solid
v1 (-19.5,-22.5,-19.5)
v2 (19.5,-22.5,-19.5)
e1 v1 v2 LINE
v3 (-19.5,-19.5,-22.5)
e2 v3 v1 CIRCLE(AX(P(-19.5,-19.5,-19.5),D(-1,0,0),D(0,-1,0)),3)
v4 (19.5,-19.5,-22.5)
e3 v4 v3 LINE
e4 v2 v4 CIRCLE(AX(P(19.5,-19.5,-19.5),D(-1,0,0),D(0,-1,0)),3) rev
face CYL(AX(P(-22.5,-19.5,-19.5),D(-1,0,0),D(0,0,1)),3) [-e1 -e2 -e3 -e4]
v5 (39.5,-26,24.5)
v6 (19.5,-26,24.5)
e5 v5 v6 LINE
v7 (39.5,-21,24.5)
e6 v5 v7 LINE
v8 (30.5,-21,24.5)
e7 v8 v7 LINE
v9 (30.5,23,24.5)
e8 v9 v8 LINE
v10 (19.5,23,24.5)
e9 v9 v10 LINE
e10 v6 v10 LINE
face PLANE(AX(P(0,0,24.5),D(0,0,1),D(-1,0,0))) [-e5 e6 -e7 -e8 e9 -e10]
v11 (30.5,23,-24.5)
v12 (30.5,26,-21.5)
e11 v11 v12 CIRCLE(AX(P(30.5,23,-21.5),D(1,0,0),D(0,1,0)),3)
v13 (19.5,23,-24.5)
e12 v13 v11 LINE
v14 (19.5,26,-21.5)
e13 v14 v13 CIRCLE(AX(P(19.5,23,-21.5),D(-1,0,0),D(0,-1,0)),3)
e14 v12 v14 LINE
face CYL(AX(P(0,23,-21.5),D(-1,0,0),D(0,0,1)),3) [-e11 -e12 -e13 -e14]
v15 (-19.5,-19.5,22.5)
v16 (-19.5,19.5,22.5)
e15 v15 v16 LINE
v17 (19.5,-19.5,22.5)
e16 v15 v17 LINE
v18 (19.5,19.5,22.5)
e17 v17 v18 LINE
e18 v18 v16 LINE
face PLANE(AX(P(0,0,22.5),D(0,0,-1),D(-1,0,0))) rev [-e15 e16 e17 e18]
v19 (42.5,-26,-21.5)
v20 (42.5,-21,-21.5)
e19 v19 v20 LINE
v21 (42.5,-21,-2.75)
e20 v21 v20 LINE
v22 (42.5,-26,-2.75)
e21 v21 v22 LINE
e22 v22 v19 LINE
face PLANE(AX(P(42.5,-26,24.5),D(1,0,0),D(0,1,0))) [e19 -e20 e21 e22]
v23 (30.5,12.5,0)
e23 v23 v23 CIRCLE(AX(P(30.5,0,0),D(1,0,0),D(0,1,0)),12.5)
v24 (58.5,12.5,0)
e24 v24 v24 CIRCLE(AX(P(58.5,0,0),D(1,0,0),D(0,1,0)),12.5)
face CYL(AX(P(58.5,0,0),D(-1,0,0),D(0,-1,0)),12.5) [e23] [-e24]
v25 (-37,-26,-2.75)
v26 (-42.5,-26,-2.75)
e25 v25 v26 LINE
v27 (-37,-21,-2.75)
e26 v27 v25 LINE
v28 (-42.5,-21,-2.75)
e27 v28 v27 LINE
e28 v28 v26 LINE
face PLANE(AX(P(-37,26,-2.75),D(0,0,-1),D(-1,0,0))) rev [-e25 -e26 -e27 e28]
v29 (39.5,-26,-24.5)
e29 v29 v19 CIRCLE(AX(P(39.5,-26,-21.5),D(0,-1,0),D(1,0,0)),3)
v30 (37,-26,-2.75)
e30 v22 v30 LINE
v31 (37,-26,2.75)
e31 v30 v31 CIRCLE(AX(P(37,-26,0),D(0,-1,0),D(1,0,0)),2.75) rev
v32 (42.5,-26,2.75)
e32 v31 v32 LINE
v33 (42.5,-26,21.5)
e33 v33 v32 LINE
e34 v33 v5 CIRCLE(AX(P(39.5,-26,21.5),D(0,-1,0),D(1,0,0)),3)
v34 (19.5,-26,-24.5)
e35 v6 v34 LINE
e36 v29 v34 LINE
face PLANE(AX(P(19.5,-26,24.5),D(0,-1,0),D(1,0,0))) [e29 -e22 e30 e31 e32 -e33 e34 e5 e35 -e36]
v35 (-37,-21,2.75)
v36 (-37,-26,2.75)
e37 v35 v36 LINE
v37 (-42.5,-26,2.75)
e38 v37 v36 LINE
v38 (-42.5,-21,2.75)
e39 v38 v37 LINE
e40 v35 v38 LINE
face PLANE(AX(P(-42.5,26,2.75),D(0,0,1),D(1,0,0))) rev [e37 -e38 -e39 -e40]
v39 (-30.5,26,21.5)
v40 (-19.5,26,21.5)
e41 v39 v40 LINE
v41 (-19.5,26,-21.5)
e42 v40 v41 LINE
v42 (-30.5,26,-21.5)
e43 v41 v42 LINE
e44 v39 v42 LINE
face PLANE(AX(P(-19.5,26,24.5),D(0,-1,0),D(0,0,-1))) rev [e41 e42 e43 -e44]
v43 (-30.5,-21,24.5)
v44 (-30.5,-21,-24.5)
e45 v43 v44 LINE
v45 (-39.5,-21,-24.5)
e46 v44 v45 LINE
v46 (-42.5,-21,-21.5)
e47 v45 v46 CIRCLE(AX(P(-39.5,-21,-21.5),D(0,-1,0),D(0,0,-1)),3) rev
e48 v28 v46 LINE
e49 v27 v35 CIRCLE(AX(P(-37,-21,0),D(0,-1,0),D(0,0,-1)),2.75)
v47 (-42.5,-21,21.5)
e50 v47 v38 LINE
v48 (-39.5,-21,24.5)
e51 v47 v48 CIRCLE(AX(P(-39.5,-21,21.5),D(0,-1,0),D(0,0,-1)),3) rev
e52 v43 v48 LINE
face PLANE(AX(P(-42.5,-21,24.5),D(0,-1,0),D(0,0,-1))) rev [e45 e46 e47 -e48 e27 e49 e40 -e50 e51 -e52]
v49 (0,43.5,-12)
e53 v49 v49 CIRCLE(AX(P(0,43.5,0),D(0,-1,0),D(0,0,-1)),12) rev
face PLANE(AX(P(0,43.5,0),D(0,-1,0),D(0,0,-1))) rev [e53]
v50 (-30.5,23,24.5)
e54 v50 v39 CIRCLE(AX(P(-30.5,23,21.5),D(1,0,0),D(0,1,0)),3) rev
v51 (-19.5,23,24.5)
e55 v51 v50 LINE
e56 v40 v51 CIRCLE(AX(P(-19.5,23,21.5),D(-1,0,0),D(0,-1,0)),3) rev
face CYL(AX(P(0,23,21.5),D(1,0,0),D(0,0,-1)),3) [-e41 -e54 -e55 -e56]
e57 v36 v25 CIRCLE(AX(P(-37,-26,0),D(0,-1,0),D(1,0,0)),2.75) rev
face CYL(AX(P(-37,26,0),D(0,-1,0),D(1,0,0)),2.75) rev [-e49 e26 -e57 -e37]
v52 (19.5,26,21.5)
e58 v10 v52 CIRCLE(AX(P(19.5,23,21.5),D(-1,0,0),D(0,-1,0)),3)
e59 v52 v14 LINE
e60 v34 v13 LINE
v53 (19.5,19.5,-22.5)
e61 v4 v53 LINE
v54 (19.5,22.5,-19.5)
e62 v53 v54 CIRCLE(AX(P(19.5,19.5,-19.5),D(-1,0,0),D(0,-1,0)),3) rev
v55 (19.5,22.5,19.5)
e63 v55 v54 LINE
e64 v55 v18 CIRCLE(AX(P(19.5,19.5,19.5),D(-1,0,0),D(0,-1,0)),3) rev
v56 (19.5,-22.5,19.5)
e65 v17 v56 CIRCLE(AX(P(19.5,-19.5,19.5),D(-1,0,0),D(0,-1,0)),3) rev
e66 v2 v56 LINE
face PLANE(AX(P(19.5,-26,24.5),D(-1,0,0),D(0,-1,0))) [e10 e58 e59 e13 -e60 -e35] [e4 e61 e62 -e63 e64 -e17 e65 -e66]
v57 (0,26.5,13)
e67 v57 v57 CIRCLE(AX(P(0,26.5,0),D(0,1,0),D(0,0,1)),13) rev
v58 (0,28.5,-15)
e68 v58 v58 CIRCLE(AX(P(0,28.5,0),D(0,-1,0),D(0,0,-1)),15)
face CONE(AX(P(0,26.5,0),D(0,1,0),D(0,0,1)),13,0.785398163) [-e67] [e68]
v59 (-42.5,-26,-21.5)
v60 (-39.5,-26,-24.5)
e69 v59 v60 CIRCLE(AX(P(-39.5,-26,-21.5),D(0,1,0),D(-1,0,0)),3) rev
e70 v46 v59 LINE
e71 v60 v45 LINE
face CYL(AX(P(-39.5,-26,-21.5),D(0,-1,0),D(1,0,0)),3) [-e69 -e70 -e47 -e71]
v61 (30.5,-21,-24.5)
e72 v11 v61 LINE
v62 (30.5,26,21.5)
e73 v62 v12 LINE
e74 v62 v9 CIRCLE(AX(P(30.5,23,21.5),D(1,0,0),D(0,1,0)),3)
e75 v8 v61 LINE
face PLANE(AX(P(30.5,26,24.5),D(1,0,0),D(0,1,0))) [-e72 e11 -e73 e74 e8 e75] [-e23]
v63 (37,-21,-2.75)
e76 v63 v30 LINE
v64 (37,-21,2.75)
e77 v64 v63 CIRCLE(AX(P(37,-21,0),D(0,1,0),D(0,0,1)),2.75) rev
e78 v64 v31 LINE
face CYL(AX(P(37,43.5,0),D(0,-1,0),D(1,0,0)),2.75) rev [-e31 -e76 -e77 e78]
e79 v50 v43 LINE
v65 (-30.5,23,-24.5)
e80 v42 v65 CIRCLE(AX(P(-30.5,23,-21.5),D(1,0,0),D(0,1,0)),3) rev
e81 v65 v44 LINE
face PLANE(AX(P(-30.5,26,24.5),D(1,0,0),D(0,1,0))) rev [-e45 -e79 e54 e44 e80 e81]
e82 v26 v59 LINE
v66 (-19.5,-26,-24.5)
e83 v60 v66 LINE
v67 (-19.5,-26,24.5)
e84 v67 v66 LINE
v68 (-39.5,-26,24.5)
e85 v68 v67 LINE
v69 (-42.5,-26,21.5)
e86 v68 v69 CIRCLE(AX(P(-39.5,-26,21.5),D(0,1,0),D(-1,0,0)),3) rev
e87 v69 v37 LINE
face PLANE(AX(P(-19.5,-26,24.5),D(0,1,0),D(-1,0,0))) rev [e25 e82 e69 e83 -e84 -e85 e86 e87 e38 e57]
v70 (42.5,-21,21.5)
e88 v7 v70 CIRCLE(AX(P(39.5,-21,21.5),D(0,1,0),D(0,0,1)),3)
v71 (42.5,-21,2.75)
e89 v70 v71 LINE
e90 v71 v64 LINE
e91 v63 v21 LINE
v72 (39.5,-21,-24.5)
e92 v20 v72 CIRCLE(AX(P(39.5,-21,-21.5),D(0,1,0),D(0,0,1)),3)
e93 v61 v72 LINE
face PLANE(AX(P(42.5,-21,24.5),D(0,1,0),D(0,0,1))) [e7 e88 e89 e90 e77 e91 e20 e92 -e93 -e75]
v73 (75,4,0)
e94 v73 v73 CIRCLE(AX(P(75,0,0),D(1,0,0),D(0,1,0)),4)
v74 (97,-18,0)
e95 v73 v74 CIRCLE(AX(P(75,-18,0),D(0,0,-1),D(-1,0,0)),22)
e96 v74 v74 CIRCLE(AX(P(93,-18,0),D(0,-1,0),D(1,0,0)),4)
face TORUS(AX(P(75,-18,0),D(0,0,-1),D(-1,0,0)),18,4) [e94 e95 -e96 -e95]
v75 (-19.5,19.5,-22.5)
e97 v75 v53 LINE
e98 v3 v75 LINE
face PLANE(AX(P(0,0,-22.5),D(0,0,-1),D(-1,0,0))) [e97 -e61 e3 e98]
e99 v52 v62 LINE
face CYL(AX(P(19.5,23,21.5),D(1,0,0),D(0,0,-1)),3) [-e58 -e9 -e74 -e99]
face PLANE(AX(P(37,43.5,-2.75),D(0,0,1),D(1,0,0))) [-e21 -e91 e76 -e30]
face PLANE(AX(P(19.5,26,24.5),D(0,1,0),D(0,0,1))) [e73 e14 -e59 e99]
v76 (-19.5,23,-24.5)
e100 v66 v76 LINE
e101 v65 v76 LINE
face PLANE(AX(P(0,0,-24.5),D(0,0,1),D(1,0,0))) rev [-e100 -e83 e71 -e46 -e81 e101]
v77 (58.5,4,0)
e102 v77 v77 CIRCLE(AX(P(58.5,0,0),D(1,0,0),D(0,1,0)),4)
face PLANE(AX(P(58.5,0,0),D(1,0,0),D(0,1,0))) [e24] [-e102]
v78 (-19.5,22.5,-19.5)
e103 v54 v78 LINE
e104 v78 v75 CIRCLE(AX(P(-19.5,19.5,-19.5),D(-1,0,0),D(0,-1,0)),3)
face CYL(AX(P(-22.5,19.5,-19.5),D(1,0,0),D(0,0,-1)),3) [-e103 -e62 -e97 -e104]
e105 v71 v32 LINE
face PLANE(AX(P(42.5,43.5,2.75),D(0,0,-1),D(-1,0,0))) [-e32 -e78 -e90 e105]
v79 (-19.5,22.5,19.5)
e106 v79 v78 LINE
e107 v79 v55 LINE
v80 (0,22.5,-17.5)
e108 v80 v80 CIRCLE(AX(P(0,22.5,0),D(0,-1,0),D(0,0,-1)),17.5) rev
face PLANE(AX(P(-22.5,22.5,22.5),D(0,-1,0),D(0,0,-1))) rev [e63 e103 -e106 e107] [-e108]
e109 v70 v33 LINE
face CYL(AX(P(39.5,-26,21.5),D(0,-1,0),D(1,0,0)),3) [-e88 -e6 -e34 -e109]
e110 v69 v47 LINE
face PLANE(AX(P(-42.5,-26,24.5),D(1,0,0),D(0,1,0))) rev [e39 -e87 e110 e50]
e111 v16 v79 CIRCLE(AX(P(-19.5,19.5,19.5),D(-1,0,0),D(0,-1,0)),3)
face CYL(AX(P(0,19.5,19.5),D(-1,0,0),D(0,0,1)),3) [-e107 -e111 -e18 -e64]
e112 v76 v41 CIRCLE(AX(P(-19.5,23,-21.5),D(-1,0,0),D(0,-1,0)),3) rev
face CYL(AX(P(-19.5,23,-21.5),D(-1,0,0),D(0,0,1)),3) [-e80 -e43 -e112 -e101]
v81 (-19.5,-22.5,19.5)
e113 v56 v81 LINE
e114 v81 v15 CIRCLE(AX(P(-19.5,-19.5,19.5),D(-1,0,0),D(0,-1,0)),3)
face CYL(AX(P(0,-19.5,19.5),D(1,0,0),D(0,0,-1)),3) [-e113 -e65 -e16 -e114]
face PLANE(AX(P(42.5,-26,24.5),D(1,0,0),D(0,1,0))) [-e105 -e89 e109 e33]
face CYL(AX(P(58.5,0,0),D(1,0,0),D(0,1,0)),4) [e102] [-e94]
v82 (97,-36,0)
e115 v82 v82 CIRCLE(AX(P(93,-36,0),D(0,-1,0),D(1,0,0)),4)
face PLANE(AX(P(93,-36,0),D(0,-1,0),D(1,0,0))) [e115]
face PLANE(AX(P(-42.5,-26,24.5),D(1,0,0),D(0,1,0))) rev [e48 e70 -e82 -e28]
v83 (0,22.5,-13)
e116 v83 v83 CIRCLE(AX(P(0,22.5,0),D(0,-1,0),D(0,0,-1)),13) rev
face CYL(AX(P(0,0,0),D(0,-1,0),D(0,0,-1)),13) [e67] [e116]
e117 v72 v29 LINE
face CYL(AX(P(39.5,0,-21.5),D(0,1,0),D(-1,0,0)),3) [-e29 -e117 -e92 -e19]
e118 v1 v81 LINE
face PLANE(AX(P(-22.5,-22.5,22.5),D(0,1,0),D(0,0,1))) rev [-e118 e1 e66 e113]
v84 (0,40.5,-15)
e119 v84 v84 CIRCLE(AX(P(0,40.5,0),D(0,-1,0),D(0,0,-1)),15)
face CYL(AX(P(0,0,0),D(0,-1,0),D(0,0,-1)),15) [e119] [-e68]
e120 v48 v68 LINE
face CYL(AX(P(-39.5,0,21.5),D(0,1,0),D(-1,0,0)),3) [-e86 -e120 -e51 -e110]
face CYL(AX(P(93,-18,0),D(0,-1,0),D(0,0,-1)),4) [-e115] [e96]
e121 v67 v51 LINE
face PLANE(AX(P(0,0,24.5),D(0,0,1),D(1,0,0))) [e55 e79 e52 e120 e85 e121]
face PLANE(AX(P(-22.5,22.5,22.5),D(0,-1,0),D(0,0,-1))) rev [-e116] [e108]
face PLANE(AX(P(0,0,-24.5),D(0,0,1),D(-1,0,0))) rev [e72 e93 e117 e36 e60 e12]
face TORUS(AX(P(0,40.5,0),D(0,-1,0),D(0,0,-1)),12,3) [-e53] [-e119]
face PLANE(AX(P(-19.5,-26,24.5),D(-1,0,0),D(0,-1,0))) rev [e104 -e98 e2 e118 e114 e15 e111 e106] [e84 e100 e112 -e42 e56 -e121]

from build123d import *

# Parameters (mm, degrees)
SKETCH_1_W          = 45
SKETCH_1_H          = 45
EXTRUDE_1_DEPTH     = 22.5
EXTRUDE_2_DEPTH     = 24.5
CUT_EXTRUDE_1_DEPTH = 72.48776119
CHAMFER_1_SIZE      = 2
FILLET_1_R          = 3
FILLET_2_R          = 3
SKETCH_5_R          = 12.5
EXTRUDE_3_DEPTH     = 28
SKETCH_6_R          = 4


with BuildPart() as part:
    # ｽｹｯﾁ1 → ﾎﾞｽ - 押し出し1 (new, symmetric)
    with BuildSketch(Plane.XY):
        Rectangle(SKETCH_1_W, SKETCH_1_H)
    extrude(amount=EXTRUDE_1_DEPTH, both=True)

    # ｽｹｯﾁ2 → ﾎﾞｽ - 押し出し2 (add, symmetric)
    with BuildSketch(Plane.XY):
        Polygon((-19.5, -26), (-42.5, -26), (-42.5, -21), (-30.5, -21), (-30.5, 26), (-19.5, 26), align=None)
    extrude_2 = extrude(amount=EXTRUDE_2_DEPTH, both=True)

    # ｽｹｯﾁ3 → ｶｯﾄ - 押し出し1 (cut, symmetric)
    with BuildSketch(Plane.XZ.offset(26)):
        with BuildLine():
            Line((-42.5, -2.75), (-42.5, 2.75))
            Line((-42.5, 2.75), (-37, 2.75))
            ThreePointArc((-37, 2.75), (-34.25, 0), (-37, -2.75))
            Line((-37, -2.75), (-42.5, -2.75))
        make_face()
    cut_extrude_1 = extrude(amount=CUT_EXTRUDE_1_DEPTH, both=True, mode=Mode.SUBTRACT)

    # ｽｹｯﾁ4 → 回転1 (revolve)
    with BuildSketch(Plane.XY, mode=Mode.PRIVATE) as revolve_1_sk:
        Polygon((0, 43.5), (-15, 43.5), (-15, 28.5), (-13, 28.5), (-13, 22.5), (0, 22.5), align=None)
    revolve(revolve_1_sk.sketch.rotate(Axis((0, 0, 0), (0, 1, 0)), 270), axis=Axis((0, 0, 0), (0, 1, 0)))

    # 面取り1
    chamfer_1_edges = [part.edges().sort_by_distance(p)[0] for p in [
        (0, 28.5, 13),
    ]]
    chamfer(chamfer_1_edges, length=CHAMFER_1_SIZE - 0.0001)  # a hair under: the kernel refuses the full size

    # ﾌｨﾚｯﾄ1
    fillet_1_edges = [part.edges().sort_by_distance(p)[0] for p in [
        (0, 43.5, 15),
    ]]
    fillet(fillet_1_edges, radius=FILLET_1_R)

    # ﾐﾗｰ1: ﾎﾞｽ - 押し出し2, ｶｯﾄ - 押し出し1 across plane
    add(extrude_2.mirror(Plane(origin=(0, 0, 0), x_dir=(0, 0, 1), z_dir=(1, 0, 0))))
    add(cut_extrude_1.mirror(Plane(origin=(0, 0, 0), x_dir=(0, 0, 1), z_dir=(1, 0, 0))), mode=Mode.SUBTRACT)

    # ﾌｨﾚｯﾄ2
    fillet_2_edges = [part.edges().sort_by_distance(p)[0] for p in [
        (0, -22.5, -22.5),
        (0, -22.5, 22.5),
        (-25, 26, -24.5),
        (-42.5, -23.5, -24.5),
        (-25, 26, 24.5),
        (-42.5, -23.5, 24.5),
        (0, 22.5, -22.5),
        (0, 22.5, 22.5),
        (42.5, -23.5, 24.5),
        (25, 26, 24.5),
        (25, 26, -24.5),
        (42.5, -23.5, -24.5),
    ]]
    fillet(fillet_2_edges, radius=FILLET_2_R)

    # ｽｹｯﾁ5 → ﾎﾞｽ - 押し出し3 (add)
    with BuildSketch(Plane(origin=(30.5, 0, 0), x_dir=(0, 0, -1), z_dir=(1, 0, 0))):
        with Locations(Location((0, 0, 0), (0, 0, 90))):
            Circle(SKETCH_5_R)
    extrude(amount=EXTRUDE_3_DEPTH)

    # ｽｲｰﾌﾟ1: sweep along a path in ｽｹｯﾁ9
    with BuildLine(Plane.XY) as sweep_1_path:
        Line((58.5, 0), (75, 0))
        ThreePointArc((75, 0), (87.727922061, -5.272077939), (93, -18))
        Line((93, -18), (93, -36))
    # ｽｹｯﾁ6 → ｽｲｰﾌﾟ1 (sweep)
    with BuildSketch(Plane(origin=(58.5, 0, 0), x_dir=(0, 0, -1), z_dir=(1, 0, 0))):
        Circle(SKETCH_6_R)
    sweep(path=sweep_1_path.line)


solid = part.part
